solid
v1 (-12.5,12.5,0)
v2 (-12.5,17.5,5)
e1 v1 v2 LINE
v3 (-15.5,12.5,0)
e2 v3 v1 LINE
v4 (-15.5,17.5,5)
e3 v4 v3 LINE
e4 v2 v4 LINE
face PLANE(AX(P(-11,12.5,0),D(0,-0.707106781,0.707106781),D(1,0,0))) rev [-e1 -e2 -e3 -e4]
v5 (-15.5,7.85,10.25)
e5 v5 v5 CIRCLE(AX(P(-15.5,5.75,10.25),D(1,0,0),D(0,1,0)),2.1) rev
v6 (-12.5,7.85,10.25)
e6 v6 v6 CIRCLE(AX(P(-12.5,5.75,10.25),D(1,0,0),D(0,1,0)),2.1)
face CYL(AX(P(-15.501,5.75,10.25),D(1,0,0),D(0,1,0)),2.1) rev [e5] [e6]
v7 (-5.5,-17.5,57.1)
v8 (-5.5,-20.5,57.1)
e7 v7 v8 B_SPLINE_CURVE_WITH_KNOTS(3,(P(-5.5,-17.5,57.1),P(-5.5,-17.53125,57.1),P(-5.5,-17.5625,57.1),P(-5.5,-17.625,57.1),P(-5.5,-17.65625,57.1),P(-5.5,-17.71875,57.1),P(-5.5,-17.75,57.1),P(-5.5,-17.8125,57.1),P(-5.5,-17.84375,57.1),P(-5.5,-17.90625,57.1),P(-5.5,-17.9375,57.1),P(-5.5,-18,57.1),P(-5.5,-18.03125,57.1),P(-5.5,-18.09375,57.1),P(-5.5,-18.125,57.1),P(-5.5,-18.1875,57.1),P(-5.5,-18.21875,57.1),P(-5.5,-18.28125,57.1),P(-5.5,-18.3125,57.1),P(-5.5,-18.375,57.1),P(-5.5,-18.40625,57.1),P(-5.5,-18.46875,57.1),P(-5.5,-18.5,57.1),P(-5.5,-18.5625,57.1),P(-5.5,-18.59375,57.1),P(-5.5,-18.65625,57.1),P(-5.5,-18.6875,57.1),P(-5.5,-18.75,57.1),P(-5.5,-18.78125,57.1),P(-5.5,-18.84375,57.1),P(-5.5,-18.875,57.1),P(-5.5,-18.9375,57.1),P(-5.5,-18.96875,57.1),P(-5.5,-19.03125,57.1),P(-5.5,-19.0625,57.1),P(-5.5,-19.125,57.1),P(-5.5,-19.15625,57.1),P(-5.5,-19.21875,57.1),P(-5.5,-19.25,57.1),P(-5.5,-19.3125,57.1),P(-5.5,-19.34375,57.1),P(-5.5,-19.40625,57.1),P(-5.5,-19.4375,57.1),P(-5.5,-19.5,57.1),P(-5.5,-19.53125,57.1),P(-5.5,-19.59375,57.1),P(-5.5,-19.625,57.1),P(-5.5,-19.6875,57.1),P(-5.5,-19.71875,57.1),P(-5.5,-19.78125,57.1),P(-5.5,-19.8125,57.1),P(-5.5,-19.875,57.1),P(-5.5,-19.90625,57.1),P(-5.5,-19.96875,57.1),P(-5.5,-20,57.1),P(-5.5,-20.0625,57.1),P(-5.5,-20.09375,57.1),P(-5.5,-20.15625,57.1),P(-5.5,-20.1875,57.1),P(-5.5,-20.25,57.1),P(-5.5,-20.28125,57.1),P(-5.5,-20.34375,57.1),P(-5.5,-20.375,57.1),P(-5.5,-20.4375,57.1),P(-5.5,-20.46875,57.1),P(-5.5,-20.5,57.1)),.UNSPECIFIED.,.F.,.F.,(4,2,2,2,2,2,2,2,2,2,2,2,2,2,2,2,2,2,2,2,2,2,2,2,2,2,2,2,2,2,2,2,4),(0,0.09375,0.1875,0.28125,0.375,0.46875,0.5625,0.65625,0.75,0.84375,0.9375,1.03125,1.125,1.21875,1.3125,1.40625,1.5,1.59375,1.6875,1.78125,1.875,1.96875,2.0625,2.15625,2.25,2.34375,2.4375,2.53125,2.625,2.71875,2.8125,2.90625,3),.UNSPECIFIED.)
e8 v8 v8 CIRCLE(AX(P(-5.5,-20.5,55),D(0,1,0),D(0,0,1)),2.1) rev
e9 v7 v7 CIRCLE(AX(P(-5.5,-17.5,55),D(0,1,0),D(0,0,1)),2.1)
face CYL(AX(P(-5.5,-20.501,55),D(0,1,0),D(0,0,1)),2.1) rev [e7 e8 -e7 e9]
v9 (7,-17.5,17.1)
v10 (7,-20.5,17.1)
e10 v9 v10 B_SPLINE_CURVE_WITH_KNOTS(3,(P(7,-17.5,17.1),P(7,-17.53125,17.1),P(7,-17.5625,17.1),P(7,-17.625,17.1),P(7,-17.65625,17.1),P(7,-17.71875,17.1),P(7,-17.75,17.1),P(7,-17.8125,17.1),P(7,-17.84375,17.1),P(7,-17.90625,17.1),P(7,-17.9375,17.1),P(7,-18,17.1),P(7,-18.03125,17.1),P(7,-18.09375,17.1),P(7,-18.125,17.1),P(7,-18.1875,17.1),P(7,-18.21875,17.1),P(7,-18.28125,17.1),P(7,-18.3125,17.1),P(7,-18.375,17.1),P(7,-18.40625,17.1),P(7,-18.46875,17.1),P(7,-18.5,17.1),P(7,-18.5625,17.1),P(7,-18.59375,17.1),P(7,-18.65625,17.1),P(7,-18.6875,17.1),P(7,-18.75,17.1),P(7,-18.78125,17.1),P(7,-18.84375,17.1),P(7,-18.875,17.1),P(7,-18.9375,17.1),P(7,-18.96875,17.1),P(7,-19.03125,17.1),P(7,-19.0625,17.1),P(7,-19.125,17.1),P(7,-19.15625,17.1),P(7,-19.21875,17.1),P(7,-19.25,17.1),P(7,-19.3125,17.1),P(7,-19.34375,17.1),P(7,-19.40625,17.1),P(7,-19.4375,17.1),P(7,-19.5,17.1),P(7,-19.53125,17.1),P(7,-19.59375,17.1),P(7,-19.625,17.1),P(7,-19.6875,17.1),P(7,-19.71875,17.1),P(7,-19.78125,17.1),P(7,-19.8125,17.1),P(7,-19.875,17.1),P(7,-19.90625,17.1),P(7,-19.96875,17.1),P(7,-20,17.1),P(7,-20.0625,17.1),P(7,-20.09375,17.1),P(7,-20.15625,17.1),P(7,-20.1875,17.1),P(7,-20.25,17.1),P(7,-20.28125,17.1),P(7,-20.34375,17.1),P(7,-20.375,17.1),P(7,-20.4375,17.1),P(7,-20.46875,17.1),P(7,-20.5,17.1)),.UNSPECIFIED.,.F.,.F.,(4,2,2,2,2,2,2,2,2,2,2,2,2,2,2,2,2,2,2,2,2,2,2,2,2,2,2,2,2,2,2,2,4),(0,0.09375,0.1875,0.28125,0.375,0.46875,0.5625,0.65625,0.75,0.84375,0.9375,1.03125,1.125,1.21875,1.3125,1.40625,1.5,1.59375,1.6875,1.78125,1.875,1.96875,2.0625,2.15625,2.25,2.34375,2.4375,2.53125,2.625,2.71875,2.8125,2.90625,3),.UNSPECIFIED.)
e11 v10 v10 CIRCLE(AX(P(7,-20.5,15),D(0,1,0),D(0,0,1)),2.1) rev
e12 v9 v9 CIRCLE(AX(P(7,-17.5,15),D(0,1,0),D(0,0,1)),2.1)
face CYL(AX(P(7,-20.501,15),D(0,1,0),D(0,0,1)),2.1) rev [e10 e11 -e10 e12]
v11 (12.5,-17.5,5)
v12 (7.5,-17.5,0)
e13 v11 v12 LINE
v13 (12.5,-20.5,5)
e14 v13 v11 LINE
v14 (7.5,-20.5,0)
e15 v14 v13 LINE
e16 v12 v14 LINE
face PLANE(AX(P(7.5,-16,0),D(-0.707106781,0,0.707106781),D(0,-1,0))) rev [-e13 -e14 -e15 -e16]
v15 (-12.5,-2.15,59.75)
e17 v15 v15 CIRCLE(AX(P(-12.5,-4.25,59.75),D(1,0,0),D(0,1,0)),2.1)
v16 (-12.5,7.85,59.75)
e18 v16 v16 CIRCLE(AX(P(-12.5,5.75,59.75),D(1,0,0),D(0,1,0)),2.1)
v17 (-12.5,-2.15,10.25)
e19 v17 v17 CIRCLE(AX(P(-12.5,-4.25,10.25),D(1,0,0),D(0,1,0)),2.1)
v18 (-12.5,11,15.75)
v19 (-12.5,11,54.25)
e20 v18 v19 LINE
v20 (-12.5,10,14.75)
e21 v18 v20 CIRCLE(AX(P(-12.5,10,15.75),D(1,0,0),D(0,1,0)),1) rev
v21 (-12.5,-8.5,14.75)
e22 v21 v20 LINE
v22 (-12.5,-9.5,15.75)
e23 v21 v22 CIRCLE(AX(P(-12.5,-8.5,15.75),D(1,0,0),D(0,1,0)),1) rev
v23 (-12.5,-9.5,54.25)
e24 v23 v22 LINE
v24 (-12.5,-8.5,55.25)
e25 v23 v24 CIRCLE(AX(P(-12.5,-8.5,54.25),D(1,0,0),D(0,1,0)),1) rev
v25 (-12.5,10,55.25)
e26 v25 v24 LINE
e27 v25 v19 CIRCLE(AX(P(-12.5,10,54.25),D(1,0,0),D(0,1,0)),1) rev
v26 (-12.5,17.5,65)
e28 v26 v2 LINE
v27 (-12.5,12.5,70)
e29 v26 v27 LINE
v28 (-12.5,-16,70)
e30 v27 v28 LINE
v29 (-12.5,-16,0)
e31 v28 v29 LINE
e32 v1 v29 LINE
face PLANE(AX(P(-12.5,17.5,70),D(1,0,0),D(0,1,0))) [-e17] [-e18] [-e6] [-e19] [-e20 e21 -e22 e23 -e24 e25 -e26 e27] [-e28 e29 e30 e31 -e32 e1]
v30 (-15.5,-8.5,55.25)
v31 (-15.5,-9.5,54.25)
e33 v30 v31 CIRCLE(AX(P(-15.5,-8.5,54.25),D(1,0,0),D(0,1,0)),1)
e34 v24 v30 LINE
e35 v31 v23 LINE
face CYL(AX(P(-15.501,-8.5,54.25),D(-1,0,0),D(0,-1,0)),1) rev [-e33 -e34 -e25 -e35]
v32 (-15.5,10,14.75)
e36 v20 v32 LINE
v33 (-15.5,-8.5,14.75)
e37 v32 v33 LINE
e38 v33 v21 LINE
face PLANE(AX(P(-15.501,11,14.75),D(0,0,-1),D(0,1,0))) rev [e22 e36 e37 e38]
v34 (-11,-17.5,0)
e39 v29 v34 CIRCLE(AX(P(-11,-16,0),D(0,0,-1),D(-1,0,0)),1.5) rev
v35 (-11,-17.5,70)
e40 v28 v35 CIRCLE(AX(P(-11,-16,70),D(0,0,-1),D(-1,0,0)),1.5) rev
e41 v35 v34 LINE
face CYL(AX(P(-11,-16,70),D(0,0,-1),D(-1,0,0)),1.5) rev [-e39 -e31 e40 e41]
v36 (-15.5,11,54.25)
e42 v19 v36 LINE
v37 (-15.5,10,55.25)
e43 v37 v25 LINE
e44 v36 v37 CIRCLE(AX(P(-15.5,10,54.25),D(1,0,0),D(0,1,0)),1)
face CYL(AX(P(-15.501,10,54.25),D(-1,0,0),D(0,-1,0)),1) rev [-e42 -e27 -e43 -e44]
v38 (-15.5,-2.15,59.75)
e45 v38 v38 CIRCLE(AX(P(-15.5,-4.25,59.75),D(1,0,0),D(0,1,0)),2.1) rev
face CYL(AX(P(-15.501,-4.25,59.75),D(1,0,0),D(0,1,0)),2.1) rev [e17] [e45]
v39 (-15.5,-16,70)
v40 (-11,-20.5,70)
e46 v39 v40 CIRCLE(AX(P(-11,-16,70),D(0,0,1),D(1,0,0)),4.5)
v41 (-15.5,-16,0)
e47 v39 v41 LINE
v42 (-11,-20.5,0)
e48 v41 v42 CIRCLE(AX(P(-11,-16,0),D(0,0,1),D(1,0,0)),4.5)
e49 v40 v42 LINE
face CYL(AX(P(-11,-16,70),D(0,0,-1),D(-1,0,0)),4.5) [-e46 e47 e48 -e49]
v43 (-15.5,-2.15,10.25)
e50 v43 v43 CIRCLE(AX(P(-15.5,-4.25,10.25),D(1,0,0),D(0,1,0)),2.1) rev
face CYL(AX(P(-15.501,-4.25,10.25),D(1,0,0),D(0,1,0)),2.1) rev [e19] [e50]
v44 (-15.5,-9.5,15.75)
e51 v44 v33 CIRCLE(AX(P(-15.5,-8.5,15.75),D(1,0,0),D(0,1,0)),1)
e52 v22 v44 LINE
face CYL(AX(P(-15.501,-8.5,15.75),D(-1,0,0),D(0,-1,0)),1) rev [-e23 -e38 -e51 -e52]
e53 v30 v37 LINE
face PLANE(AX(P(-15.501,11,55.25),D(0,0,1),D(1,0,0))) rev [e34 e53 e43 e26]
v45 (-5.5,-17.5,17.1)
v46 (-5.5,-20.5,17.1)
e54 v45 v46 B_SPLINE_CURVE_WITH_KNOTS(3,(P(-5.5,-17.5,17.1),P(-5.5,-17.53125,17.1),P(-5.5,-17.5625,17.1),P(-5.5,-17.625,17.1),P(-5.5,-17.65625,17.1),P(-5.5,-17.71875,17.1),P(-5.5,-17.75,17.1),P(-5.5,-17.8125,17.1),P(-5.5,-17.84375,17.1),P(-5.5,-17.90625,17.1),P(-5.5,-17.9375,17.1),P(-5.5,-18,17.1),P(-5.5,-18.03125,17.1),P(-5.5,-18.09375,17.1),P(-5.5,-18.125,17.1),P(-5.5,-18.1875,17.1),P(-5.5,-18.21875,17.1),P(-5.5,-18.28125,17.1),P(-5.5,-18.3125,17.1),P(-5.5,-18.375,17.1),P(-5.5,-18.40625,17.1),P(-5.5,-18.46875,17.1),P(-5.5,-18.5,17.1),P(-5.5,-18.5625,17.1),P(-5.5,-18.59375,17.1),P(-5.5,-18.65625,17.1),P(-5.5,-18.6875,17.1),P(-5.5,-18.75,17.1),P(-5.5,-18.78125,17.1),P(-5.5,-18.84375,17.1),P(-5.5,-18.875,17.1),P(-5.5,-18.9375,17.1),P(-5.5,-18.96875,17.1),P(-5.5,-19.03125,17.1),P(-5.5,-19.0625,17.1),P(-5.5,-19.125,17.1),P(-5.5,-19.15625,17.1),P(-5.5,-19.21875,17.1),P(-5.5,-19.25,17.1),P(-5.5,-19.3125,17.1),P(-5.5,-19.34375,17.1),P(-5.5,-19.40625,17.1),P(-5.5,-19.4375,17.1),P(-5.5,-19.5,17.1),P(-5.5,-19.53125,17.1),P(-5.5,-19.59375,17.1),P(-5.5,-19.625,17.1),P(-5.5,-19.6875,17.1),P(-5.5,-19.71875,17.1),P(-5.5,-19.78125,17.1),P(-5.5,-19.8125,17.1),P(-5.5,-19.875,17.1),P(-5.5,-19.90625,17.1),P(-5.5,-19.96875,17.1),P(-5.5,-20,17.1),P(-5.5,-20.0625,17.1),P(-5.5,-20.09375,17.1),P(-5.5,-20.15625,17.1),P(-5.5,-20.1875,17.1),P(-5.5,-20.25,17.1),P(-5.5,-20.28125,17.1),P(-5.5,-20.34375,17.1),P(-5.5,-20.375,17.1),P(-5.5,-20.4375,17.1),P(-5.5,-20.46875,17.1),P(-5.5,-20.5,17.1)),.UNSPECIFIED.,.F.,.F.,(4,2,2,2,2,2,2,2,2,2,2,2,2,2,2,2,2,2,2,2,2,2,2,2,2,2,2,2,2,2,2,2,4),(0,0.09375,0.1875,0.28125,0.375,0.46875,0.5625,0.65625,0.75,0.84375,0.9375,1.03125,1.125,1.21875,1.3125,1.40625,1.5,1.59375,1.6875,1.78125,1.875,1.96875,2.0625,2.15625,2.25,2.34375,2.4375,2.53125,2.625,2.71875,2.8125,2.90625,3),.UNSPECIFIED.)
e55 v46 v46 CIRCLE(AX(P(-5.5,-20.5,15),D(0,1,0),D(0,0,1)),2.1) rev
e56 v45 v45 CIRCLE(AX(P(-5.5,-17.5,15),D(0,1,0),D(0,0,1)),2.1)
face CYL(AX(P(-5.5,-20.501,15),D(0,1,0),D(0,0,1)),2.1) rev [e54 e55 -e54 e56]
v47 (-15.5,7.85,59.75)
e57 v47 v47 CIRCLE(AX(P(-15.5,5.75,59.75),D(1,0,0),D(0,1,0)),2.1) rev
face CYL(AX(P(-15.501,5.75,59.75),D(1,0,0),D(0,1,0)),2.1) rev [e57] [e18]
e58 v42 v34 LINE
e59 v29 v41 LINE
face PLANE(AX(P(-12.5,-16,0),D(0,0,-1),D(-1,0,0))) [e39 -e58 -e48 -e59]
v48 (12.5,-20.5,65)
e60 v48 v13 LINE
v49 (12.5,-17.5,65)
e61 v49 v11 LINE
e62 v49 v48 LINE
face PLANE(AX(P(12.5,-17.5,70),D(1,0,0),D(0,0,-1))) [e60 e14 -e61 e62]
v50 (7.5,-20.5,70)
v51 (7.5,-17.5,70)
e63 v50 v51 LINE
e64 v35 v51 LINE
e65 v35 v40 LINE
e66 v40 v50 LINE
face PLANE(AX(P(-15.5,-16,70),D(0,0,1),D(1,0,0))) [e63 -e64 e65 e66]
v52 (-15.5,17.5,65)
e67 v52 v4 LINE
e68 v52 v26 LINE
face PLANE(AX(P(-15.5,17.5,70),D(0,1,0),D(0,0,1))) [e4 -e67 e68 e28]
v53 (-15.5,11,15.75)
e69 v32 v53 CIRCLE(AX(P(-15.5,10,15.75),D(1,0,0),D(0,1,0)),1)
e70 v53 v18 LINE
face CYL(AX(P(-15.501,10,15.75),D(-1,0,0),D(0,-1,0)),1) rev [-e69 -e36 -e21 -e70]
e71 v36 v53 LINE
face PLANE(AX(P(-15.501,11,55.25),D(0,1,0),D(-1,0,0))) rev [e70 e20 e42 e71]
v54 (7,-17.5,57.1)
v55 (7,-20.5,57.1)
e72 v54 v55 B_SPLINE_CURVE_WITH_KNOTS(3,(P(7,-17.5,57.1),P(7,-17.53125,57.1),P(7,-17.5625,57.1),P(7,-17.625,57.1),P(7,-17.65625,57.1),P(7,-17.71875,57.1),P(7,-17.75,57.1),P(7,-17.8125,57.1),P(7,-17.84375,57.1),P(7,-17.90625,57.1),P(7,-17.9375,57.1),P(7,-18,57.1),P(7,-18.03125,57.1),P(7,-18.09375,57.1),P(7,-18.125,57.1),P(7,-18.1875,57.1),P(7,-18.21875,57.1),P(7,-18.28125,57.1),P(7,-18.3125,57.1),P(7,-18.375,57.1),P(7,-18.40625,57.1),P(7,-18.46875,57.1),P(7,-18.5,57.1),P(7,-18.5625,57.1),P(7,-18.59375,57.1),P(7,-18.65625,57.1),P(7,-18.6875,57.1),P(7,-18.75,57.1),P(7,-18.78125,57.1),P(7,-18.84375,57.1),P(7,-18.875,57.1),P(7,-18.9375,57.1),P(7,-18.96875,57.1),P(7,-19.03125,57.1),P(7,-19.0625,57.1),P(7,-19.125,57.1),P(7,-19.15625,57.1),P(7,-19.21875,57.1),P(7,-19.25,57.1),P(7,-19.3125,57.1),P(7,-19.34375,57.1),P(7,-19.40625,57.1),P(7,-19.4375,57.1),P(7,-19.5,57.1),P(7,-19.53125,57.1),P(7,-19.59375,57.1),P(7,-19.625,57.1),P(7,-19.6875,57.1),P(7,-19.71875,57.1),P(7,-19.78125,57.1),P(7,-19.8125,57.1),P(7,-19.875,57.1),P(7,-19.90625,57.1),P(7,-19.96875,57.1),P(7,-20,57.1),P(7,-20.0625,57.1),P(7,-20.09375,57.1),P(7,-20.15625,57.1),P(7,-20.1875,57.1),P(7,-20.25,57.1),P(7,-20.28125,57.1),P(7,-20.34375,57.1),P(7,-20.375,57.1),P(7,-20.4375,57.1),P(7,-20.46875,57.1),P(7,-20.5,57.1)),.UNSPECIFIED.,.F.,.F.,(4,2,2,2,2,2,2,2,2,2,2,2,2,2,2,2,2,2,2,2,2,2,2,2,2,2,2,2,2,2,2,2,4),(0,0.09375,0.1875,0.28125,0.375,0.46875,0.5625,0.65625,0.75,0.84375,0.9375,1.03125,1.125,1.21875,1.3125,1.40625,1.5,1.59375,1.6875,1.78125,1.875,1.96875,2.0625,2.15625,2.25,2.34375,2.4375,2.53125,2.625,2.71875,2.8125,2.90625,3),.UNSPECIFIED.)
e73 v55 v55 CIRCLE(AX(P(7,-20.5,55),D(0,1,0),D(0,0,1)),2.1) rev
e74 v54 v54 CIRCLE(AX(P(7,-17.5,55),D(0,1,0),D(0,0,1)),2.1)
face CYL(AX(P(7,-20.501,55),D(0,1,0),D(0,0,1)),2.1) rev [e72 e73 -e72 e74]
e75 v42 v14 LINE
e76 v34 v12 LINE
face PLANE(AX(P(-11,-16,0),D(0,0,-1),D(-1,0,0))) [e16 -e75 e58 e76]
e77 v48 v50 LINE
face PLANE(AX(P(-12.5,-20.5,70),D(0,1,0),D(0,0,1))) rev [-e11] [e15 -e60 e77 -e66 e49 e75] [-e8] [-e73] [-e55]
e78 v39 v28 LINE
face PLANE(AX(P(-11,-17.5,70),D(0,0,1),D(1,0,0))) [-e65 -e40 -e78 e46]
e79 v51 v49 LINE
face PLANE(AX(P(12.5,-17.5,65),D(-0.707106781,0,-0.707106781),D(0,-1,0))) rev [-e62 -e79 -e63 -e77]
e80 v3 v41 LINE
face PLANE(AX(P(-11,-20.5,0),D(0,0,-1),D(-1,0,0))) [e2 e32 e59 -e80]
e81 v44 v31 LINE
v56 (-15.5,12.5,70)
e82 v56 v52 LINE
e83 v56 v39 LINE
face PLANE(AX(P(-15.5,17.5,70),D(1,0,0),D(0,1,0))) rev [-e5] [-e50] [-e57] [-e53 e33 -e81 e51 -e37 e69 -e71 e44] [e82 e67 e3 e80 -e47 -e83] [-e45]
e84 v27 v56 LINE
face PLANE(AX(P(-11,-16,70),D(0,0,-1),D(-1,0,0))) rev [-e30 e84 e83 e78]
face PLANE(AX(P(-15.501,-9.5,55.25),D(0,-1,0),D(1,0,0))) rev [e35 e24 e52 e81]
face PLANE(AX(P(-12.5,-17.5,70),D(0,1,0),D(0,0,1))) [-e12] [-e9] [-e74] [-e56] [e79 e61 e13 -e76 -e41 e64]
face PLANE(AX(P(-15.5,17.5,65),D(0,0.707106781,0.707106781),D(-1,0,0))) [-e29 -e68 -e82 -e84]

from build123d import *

# Parameters (mm, degrees)
SM_BASE_FLANGE_1_DEPTH = 70
CUT_EXTRUDE_7_REACH    = 79.105
SKETCH_18_W            = 40.5
SKETCH_18_H            = 20.5
CUT_EXTRUDE_8_REACH    = 79.105
SKETCH_19_R            = 2.1
FILLET_2_R             = 1
CUT_EXTRUDE_9_REACH    = 81.783
SKETCH_20_R            = 2.1
CHAMFER_3_SIZE         = 5


# Sheet-metal steps are written as plain solids
with BuildPart() as part:
    # Sketch 1 → 基材-凸緣1 (new body)
    with BuildSketch(Plane.XY):
        with BuildLine():
            Line((-12.5, 17.5), (-12.5, -16))
            ThreePointArc((-12.5, -16), (-12.060660172, -17.060660172), (-11, -17.5))
            Line((-11, -17.5), (12.5, -17.5))
            Line((12.5, -17.5), (12.5, -20.5))
            Line((12.5, -20.5), (-11, -20.5))
            ThreePointArc((-11, -20.5), (-14.181980515, -19.181980515), (-15.5, -16))
            Line((-15.5, -16), (-15.5, 17.5))
            Line((-15.5, 17.5), (-12.5, 17.5))
        make_face()
    extrude(amount=SM_BASE_FLANGE_1_DEPTH)

    # 草圖18 → 除料-伸長7 (cut, up to next)
    with BuildSketch(Plane(origin=(-12.5, 0, 0), x_dir=(0, 0, -1), z_dir=(1, 0, 0)), mode=Mode.PRIVATE) as cut_extrude_7_sk1:
        with Locations((-35, 0.75)):
            Rectangle(SKETCH_18_W, SKETCH_18_H)
    cut_extrude_7_tool1 = extrude(cut_extrude_7_sk1.sketch, amount=-CUT_EXTRUDE_7_REACH, mode=Mode.PRIVATE) & part.part
    add(cut_extrude_7_tool1.solids().sort_by_distance((-12.5, 0.75, 35))[0], mode=Mode.SUBTRACT)

    # 草圖19 → 除料-伸長8 (cut, up to next)
    with BuildSketch(Plane(origin=(-12.5, 0, 0), x_dir=(0, 0, -1), z_dir=(1, 0, 0)), mode=Mode.PRIVATE) as cut_extrude_8_sk1:
        with Locations(Location((-10.25, 5.75, 0), (0, 0, 90))):
            Circle(SKETCH_19_R)
    cut_extrude_8_tool1 = extrude(cut_extrude_8_sk1.sketch, amount=-CUT_EXTRUDE_8_REACH, mode=Mode.PRIVATE) & part.part
    # 草圖19 → 除料-伸長8 (cut, up to next)
    with BuildSketch(Plane(origin=(-12.5, 0, 0), x_dir=(0, 0, -1), z_dir=(1, 0, 0)), mode=Mode.PRIVATE) as cut_extrude_8_sk2:
        with Locations(Location((-10.25, -4.25, 0), (0, 0, 90))):
            Circle(SKETCH_19_R)
    cut_extrude_8_tool2 = extrude(cut_extrude_8_sk2.sketch, amount=-CUT_EXTRUDE_8_REACH, mode=Mode.PRIVATE) & part.part
    # 草圖19 → 除料-伸長8 (cut, up to next)
    with BuildSketch(Plane(origin=(-12.5, 0, 0), x_dir=(0, 0, -1), z_dir=(1, 0, 0)), mode=Mode.PRIVATE) as cut_extrude_8_sk3:
        with Locations(Location((-59.75, -4.25, 0), (0, 0, 90))):
            Circle(SKETCH_19_R)
    cut_extrude_8_tool3 = extrude(cut_extrude_8_sk3.sketch, amount=-CUT_EXTRUDE_8_REACH, mode=Mode.PRIVATE) & part.part
    # 草圖19 → 除料-伸長8 (cut, up to next)
    with BuildSketch(Plane(origin=(-12.5, 0, 0), x_dir=(0, 0, -1), z_dir=(1, 0, 0)), mode=Mode.PRIVATE) as cut_extrude_8_sk4:
        with Locations(Location((-59.75, 5.75, 0), (0, 0, 90))):
            Circle(SKETCH_19_R)
    cut_extrude_8_tool4 = extrude(cut_extrude_8_sk4.sketch, amount=-CUT_EXTRUDE_8_REACH, mode=Mode.PRIVATE) & part.part
    add(cut_extrude_8_tool1.solids().sort_by_distance((-12.5, 5.75, 10.25))[0], mode=Mode.SUBTRACT)
    add(cut_extrude_8_tool2.solids().sort_by_distance((-12.5, -4.25, 10.25))[0], mode=Mode.SUBTRACT)
    add(cut_extrude_8_tool3.solids().sort_by_distance((-12.5, -4.25, 59.75))[0], mode=Mode.SUBTRACT)
    add(cut_extrude_8_tool4.solids().sort_by_distance((-12.5, 5.75, 59.75))[0], mode=Mode.SUBTRACT)

    # 圓角2
    fillet_2_edges = [part.edges().sort_by_distance(p)[0] for p in [
        (-14, 11, 14.75),
        (-14, -9.5, 14.75),
        (-14, -9.5, 55.25),
        (-14, 11, 55.25),
    ]]
    fillet(fillet_2_edges, radius=FILLET_2_R)

    # 草圖20 → 除料-伸長9 (cut, up to next)
    with BuildSketch(Plane(origin=(0, -17.5, 0), x_dir=(1, 0, 0), z_dir=(0, 1, 0)), mode=Mode.PRIVATE) as cut_extrude_9_sk1:
        with Locations(Location((-5.5, -15, 0), (0, 0, 270))):
            Circle(SKETCH_20_R)
    cut_extrude_9_tool1 = extrude(cut_extrude_9_sk1.sketch, amount=-CUT_EXTRUDE_9_REACH, mode=Mode.PRIVATE) & part.part
    # 草圖20 → 除料-伸長9 (cut, up to next)
    with BuildSketch(Plane(origin=(0, -17.5, 0), x_dir=(1, 0, 0), z_dir=(0, 1, 0)), mode=Mode.PRIVATE) as cut_extrude_9_sk2:
        with Locations(Location((7, -15, 0), (0, 0, 270))):
            Circle(SKETCH_20_R)
    cut_extrude_9_tool2 = extrude(cut_extrude_9_sk2.sketch, amount=-CUT_EXTRUDE_9_REACH, mode=Mode.PRIVATE) & part.part
    # 草圖20 → 除料-伸長9 (cut, up to next)
    with BuildSketch(Plane(origin=(0, -17.5, 0), x_dir=(1, 0, 0), z_dir=(0, 1, 0)), mode=Mode.PRIVATE) as cut_extrude_9_sk3:
        with Locations(Location((7, -55, 0), (0, 0, 270))):
            Circle(SKETCH_20_R)
    cut_extrude_9_tool3 = extrude(cut_extrude_9_sk3.sketch, amount=-CUT_EXTRUDE_9_REACH, mode=Mode.PRIVATE) & part.part
    # 草圖20 → 除料-伸長9 (cut, up to next)
    with BuildSketch(Plane(origin=(0, -17.5, 0), x_dir=(1, 0, 0), z_dir=(0, 1, 0)), mode=Mode.PRIVATE) as cut_extrude_9_sk4:
        with Locations(Location((-5.5, -55, 0), (0, 0, 270))):
            Circle(SKETCH_20_R)
    cut_extrude_9_tool4 = extrude(cut_extrude_9_sk4.sketch, amount=-CUT_EXTRUDE_9_REACH, mode=Mode.PRIVATE) & part.part
    add(cut_extrude_9_tool1.solids().sort_by_distance((-5.5, -17.5, 15))[0], mode=Mode.SUBTRACT)
    add(cut_extrude_9_tool2.solids().sort_by_distance((7, -17.5, 15))[0], mode=Mode.SUBTRACT)
    add(cut_extrude_9_tool3.solids().sort_by_distance((7, -17.5, 55))[0], mode=Mode.SUBTRACT)
    add(cut_extrude_9_tool4.solids().sort_by_distance((-5.5, -17.5, 55))[0], mode=Mode.SUBTRACT)

    # 導角3
    chamfer_3_edges = [part.edges().sort_by_distance(p)[0] for p in [
        (-14, 17.5, 70),
        (-14, 17.5, 0),
        (12.5, -19, 70),
        (12.5, -19, 0),
    ]]
    chamfer(chamfer_3_edges, length=CHAMFER_3_SIZE)


solid = part.part
